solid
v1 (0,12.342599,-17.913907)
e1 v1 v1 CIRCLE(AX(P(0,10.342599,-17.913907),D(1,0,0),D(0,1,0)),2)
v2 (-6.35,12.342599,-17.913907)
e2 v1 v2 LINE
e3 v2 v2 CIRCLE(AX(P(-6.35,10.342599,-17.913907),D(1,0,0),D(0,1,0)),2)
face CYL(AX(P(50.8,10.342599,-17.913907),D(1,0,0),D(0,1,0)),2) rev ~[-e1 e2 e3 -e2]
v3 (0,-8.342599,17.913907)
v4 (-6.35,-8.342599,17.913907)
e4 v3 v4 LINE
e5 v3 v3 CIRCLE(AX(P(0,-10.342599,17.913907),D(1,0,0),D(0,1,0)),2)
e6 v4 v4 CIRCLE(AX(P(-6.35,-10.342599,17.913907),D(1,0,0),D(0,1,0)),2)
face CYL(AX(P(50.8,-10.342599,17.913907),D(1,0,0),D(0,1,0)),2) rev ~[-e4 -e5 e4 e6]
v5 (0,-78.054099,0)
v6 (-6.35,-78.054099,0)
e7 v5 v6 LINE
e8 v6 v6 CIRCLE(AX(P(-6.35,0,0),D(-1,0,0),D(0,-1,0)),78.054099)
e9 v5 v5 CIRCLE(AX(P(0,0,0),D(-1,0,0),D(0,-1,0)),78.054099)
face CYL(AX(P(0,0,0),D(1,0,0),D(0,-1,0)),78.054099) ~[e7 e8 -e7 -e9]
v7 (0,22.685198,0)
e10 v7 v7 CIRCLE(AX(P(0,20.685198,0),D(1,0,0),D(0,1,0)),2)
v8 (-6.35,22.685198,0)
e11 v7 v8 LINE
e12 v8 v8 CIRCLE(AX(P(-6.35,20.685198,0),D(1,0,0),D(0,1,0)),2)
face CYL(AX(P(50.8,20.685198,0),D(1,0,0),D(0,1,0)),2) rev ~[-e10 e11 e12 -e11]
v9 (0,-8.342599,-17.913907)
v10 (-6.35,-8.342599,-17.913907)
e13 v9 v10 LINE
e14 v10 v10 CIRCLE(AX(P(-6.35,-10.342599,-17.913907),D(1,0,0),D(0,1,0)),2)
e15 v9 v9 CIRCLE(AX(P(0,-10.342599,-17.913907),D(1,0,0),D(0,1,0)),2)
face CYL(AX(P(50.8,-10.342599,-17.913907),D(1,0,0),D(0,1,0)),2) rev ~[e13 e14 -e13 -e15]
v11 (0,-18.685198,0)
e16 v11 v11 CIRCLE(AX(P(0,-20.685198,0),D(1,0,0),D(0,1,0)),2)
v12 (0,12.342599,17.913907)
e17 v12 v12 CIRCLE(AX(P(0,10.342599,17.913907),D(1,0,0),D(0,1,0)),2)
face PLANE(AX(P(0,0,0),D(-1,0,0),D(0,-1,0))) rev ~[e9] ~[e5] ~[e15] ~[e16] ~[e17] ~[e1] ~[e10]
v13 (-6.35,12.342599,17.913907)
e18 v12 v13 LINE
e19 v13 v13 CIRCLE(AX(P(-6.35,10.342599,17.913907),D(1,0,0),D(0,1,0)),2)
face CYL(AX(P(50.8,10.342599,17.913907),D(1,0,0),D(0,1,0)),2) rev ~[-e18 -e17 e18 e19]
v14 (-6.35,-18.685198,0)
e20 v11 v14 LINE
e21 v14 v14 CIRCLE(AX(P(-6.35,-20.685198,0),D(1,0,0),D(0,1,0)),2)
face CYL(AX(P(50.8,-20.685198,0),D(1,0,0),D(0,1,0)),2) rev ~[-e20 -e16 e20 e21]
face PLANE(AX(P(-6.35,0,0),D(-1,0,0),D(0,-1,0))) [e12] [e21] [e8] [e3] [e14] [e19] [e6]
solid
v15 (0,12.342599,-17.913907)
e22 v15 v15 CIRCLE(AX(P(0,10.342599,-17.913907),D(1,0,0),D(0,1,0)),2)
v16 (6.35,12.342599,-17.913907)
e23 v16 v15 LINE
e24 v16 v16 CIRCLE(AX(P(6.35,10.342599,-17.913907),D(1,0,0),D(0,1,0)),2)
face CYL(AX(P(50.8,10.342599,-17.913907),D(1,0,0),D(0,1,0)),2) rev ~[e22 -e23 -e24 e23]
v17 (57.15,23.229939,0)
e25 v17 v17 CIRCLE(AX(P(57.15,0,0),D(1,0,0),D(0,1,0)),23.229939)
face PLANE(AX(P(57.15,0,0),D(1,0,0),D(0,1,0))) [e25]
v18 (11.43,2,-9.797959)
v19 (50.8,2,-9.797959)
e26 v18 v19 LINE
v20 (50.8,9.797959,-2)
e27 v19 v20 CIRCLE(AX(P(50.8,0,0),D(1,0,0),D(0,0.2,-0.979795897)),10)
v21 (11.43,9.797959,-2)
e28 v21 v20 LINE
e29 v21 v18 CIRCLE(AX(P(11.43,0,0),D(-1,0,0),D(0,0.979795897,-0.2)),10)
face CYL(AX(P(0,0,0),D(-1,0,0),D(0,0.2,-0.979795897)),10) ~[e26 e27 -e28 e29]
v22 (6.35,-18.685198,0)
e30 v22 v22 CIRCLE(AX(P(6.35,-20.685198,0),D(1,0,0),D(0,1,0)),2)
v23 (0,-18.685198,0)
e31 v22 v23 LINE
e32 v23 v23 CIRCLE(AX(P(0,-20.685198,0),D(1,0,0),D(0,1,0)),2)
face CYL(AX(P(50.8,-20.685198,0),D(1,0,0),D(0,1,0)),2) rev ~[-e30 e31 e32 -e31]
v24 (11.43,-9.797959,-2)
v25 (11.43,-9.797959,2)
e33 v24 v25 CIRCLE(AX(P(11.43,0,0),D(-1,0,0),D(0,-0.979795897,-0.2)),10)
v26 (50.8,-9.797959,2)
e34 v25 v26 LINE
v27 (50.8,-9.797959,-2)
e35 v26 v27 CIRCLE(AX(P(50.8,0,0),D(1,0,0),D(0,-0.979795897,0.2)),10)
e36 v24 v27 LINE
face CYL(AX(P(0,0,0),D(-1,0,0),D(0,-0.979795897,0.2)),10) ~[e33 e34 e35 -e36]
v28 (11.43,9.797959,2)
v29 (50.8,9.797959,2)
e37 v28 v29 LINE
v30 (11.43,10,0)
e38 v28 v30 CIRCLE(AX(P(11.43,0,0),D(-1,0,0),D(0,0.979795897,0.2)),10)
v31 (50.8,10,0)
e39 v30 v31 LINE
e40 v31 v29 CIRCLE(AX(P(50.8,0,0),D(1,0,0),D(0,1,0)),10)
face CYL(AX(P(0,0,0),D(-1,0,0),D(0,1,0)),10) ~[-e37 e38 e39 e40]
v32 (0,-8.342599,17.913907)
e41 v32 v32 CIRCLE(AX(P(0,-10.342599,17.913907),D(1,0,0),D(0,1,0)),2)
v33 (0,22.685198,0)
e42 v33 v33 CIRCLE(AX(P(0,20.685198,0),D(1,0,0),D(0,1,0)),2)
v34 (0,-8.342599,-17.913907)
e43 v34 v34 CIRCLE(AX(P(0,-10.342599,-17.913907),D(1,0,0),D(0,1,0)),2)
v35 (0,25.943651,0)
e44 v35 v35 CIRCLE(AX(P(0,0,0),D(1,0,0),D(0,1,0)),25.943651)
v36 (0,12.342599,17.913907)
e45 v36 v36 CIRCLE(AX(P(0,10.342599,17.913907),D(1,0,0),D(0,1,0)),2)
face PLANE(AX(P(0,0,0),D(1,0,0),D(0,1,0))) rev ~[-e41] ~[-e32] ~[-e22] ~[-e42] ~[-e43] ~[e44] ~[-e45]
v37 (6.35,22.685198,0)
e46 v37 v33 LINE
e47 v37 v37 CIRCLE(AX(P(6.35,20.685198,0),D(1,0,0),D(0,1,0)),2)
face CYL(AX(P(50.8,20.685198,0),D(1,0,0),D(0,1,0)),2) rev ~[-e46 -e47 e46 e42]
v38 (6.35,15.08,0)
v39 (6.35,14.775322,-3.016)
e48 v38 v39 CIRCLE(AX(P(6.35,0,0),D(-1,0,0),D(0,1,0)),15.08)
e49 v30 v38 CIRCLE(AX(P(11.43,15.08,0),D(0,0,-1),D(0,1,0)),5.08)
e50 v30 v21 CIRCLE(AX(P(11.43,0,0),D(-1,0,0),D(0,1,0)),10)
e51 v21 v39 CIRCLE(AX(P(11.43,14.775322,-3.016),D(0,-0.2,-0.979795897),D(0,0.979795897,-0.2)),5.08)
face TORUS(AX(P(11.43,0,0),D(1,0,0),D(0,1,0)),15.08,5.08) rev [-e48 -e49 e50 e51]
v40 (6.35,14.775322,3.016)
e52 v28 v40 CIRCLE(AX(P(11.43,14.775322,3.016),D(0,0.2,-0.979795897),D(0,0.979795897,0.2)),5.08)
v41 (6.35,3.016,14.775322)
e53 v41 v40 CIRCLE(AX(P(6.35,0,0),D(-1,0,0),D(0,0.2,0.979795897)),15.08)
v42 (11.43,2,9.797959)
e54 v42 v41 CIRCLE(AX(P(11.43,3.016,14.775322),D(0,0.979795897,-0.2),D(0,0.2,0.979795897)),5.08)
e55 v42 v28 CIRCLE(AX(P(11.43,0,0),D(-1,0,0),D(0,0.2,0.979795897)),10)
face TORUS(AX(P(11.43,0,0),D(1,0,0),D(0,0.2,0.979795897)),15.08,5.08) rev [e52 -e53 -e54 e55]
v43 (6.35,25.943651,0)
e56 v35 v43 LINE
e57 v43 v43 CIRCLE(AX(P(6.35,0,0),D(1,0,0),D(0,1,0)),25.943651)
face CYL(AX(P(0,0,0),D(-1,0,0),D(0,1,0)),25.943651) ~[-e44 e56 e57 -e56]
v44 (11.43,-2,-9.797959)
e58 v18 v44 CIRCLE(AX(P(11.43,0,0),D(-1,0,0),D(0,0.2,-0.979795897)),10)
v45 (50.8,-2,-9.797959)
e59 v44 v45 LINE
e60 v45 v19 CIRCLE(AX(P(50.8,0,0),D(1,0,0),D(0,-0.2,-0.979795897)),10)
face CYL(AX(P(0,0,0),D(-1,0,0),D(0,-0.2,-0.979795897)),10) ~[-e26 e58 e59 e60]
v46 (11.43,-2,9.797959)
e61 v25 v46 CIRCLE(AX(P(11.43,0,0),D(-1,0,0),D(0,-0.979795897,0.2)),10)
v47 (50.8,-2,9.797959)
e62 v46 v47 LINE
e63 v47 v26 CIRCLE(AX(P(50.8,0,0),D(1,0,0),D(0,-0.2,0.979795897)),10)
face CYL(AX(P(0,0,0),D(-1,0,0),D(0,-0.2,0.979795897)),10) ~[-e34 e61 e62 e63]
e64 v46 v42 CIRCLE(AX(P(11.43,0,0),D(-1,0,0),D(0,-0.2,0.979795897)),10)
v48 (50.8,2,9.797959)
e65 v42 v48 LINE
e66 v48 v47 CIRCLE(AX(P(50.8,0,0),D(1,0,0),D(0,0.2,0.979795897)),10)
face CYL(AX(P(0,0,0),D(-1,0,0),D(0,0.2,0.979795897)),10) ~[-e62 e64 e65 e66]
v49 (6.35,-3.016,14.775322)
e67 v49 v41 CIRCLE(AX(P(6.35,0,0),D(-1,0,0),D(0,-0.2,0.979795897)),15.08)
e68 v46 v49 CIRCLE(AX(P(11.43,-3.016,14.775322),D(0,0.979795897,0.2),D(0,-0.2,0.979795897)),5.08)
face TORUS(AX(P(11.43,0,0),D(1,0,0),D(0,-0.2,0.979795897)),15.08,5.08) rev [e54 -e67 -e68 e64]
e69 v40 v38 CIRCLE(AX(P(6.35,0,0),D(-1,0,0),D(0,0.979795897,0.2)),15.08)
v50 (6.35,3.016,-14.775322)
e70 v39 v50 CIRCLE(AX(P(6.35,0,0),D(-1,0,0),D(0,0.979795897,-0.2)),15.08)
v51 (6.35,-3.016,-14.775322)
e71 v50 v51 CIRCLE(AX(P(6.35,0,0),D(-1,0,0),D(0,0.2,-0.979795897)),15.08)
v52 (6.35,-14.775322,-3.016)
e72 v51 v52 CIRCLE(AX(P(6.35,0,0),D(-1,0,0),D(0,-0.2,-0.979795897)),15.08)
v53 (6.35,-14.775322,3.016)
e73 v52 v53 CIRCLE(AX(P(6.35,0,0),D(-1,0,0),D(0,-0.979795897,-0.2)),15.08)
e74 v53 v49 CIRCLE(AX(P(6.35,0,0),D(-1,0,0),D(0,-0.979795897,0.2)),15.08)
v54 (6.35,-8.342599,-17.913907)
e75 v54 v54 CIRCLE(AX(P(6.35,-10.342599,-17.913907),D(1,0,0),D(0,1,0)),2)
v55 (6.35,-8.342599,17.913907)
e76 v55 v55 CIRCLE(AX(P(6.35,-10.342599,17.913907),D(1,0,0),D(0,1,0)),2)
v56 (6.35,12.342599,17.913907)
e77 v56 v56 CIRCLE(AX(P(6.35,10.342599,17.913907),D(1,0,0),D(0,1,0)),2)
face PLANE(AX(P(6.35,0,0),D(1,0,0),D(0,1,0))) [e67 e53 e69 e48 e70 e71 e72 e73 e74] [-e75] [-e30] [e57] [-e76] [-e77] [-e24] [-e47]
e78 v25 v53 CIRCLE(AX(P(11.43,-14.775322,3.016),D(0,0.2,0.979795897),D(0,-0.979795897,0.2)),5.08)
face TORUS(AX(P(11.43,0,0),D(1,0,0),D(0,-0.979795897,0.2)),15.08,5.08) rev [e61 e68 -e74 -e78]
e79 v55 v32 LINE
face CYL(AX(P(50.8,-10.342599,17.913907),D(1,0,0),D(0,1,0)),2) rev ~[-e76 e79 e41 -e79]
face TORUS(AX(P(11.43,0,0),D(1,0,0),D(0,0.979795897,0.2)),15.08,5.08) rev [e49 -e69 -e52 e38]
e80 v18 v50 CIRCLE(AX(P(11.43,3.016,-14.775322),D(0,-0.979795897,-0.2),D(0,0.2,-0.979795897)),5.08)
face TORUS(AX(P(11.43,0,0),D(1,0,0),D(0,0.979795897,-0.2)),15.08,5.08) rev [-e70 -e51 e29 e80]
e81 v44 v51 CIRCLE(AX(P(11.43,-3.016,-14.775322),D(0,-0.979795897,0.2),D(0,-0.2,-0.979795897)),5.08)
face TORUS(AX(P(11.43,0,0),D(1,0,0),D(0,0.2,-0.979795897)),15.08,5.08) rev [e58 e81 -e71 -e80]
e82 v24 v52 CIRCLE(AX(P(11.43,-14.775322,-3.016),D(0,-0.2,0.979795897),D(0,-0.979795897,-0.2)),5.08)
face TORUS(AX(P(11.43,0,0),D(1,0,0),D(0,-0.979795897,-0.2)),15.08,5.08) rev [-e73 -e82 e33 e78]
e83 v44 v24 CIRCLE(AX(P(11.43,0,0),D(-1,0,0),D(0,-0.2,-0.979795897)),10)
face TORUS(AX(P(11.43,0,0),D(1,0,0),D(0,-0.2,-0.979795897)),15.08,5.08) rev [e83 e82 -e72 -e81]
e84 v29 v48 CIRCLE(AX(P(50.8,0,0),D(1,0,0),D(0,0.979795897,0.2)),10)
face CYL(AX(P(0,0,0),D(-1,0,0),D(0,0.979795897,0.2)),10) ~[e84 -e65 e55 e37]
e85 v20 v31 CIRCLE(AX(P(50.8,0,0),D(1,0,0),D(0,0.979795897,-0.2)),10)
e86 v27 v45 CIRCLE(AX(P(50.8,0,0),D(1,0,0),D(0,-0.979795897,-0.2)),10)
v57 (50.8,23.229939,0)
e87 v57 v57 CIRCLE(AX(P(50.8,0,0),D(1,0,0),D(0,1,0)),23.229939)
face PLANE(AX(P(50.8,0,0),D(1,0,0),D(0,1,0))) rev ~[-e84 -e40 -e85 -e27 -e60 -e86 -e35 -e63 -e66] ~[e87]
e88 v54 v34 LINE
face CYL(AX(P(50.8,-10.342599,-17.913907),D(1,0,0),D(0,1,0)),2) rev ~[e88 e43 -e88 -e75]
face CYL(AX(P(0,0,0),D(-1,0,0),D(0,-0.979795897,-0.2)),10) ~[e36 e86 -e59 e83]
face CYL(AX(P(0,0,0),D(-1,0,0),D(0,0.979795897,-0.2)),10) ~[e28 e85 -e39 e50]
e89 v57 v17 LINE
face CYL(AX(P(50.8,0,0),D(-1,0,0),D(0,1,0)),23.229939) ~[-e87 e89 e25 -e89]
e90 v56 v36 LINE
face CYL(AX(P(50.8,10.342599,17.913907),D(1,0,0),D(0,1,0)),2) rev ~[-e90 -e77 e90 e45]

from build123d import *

# Parameters (mm, degrees)
F0_W       = 6
F0_H       = 4
F0_W_2     = 4
F0_H_2     = 6
F1_DEPTH   = 50.8
F0_R       = 25.9436510784
F2_DEPTH   = 6.35
F3_R       = 78.0540986602
F3_R_2     = 25.9436510784
F4_DEPTH   = 6.35
F5_R       = 23.2299386705
F5_W       = 4
F5_H       = 6
F5_W_2     = 6
F5_H_2     = 4
F6_DEPTH   = 6.35
F7_R       = 5.08
F8_D       = 4
F8_DEPTH   = 57.151
F8_2_D     = 4
F8_2_DEPTH = 57.151


with BuildPart() as f1:
    # F0 (on Right) → F1 (new body)
    with BuildSketch(Plane.YZ):
        with BuildLine():
            ThreePointArc((2, -9.7979589711), (7.0710678119, -7.0710678119), (9.7979589711, -2))
            Line((9.7979589711, -2), (8, -2))
            Line((8, -2), (2, -2))
            Line((2, -2), (2, -8))
            Line((2, -8), (2, -9.7979589711))
        make_face()
        with BuildLine():
            ThreePointArc((-9.7979589711, -2), (-7.0710678119, -7.0710678119), (-2, -9.7979589711))
            Line((-2, -9.7979589711), (-2, -8))
            Line((-2, -8), (-2, -2))
            Line((-2, -2), (-8, -2))
            Line((-8, -2), (-9.7979589711, -2))
        make_face()
        with BuildLine():
            Line((-2, 8), (-2, 9.7979589711))
            ThreePointArc((-2, 9.7979589711), (-7.0710678119, 7.0710678119), (-9.7979589711, 2))
            Line((-9.7979589711, 2), (-8, 2))
            Line((-8, 2), (-2, 2))
            Line((-2, 2), (-2, 8))
        make_face()
        with BuildLine():
            Line((8, 2), (9.7979589711, 2))
            ThreePointArc((9.7979589711, 2), (7.0710678119, 7.0710678119), (2, 9.7979589711))
            Line((2, 9.7979589711), (2, 8))
            Line((2, 8), (2, 2))
            Line((2, 2), (8, 2))
        make_face()
        with Locations((5, 0)):
            Rectangle(F0_W, F0_H)
        Rectangle(F0_W_2, F0_H)
        with Locations((0, 5)):
            Rectangle(F0_W_2, F0_H_2)
        with Locations((-5, 0)):
            Rectangle(F0_W, F0_H)
        with Locations((0, -5)):
            Rectangle(F0_W_2, F0_H_2)
        with BuildLine():
            Line((-8, 2), (-9.7979589711, 2))
            ThreePointArc((-9.7979589711, 2), (-10, 0), (-9.7979589711, -2))
            Line((-9.7979589711, -2), (-8, -2))
            Line((-8, -2), (-8, 2))
        make_face()
        with BuildLine():
            ThreePointArc((-2, -9.7979589711), (0, -10), (2, -9.7979589711))
            Line((2, -9.7979589711), (2, -8))
            Line((2, -8), (-2, -8))
            Line((-2, -8), (-2, -9.7979589711))
        make_face()
        with BuildLine():
            ThreePointArc((9.7979589711, -2), (9.9493615301, -1.0050896201), (10, 0))
            ThreePointArc((10, 0), (9.9493615301, 1.0050896201), (9.7979589711, 2))
            Line((9.7979589711, 2), (8, 2))
            Line((8, 2), (8, -2))
            Line((8, -2), (9.7979589711, -2))
        make_face()
        with BuildLine():
            Line((2, 8), (2, 9.7979589711))
            ThreePointArc((2, 9.7979589711), (0, 10), (-2, 9.7979589711))
            Line((-2, 9.7979589711), (-2, 8))
            Line((-2, 8), (2, 8))
        make_face()
    extrude(amount=F1_DEPTH)

    # F0 (on Right) → F2 (join)
    with BuildSketch(Plane.YZ):
        Circle(F0_R)
        Polygon((10.3425991178, 17.9139071543), (20.6851982355, 0), (10.3425991178, -17.9139071543), (-10.3425991178, -17.9139071543), (-20.6851982355, 0), (-10.3425991178, 17.9139071543), align=None, mode=Mode.SUBTRACT)
        Polygon((10.3425991178, -17.9139071543), (20.6851982355, 0), (10.3425991178, 17.9139071543), (-10.3425991178, 17.9139071543), (-20.6851982355, 0), (-10.3425991178, -17.9139071543), align=None)
        with BuildLine():
            ThreePointArc((2, 9.7979589711), (7.0710678119, 7.0710678119), (9.7979589711, 2))
            Line((9.7979589711, 2), (12.5, 2))
            Line((12.5, 2), (12.5, -2))
            Line((12.5, -2), (9.7979589711, -2))
            ThreePointArc((9.7979589711, -2), (7.0710678119, -7.0710678119), (2, -9.7979589711))
            Line((2, -9.7979589711), (2, -12.5))
            Line((2, -12.5), (-2, -12.5))
            Line((-2, -12.5), (-2, -9.7979589711))
            ThreePointArc((-2, -9.7979589711), (-7.0710678119, -7.0710678119), (-9.7979589711, -2))
            Line((-9.7979589711, -2), (-12.5, -2))
            Line((-12.5, -2), (-12.5, 2))
            Line((-12.5, 2), (-9.7979589711, 2))
            ThreePointArc((-9.7979589711, 2), (-7.0710678119, 7.0710678119), (-2, 9.7979589711))
            Line((-2, 9.7979589711), (-2, 12.5))
            Line((-2, 12.5), (2, 12.5))
            Line((2, 12.5), (2, 9.7979589711))
        make_face(mode=Mode.SUBTRACT)
        with BuildLine():
            ThreePointArc((-2, 9.7979589711), (0, 10), (2, 9.7979589711))
            Line((2, 9.7979589711), (2, 12.5))
            Line((2, 12.5), (-2, 12.5))
            Line((-2, 12.5), (-2, 9.7979589711))
        make_face()
        with BuildLine():
            ThreePointArc((9.7979589711, 2), (9.9493615301, 1.0050896201), (10, 0))
            ThreePointArc((10, 0), (9.9493615301, -1.0050896201), (9.7979589711, -2))
            Line((9.7979589711, -2), (12.5, -2))
            Line((12.5, -2), (12.5, 2))
            Line((12.5, 2), (9.7979589711, 2))
        make_face()
        with BuildLine():
            ThreePointArc((-9.7979589711, -2), (-10, 0), (-9.7979589711, 2))
            Line((-9.7979589711, 2), (-12.5, 2))
            Line((-12.5, 2), (-12.5, -2))
            Line((-12.5, -2), (-9.7979589711, -2))
        make_face()
        with BuildLine():
            Line((2, -12.5), (2, -9.7979589711))
            ThreePointArc((2, -9.7979589711), (0, -10), (-2, -9.7979589711))
            Line((-2, -9.7979589711), (-2, -12.5))
            Line((-2, -12.5), (2, -12.5))
        make_face()
    extrude(amount=F2_DEPTH)

    # F5 (on face) → F6 (join)
    with BuildSketch(Plane.YZ.offset(50.8)):
        Circle(F5_R)
        Polygon((10.3425991178, 17.9139071543), (20.6851982355, 0), (10.3425991178, -17.9139071543), (-10.3425991178, -17.9139071543), (-20.6851982355, 0), (-10.3425991178, 17.9139071543), align=None, mode=Mode.SUBTRACT)
        Polygon((10.3425991178, -17.9139071543), (20.6851982355, 0), (10.3425991178, 17.9139071543), (-10.3425991178, 17.9139071543), (-20.6851982355, 0), (-10.3425991178, -17.9139071543), align=None)
        with BuildLine():
            ThreePointArc((2, 9.7979589711), (7.0710678119, 7.0710678119), (9.7979589711, 2))
            Line((9.7979589711, 2), (12.5, 2))
            Line((12.5, 2), (12.5, -2))
            Line((12.5, -2), (9.7979589711, -2))
            ThreePointArc((9.7979589711, -2), (7.0710678119, -7.0710678119), (2, -9.7979589711))
            Line((2, -9.7979589711), (2, -12.5))
            Line((2, -12.5), (-2, -12.5))
            Line((-2, -12.5), (-2, -9.7979589711))
            ThreePointArc((-2, -9.7979589711), (-7.0710678119, -7.0710678119), (-9.7979589711, -2))
            Line((-9.7979589711, -2), (-12.5, -2))
            Line((-12.5, -2), (-12.5, 2))
            Line((-12.5, 2), (-9.7979589711, 2))
            ThreePointArc((-9.7979589711, 2), (-7.0710678119, 7.0710678119), (-2, 9.7979589711))
            Line((-2, 9.7979589711), (-2, 12.5))
            Line((-2, 12.5), (2, 12.5))
            Line((2, 12.5), (2, 9.7979589711))
        make_face(mode=Mode.SUBTRACT)
        with BuildLine():
            Line((8, 2), (9.7979589711, 2))
            ThreePointArc((9.7979589711, 2), (7.0710678119, 7.0710678119), (2, 9.7979589711))
            Line((2, 9.7979589711), (2, 8))
            Line((2, 8), (2, 2))
            Line((2, 2), (8, 2))
        make_face()
        with BuildLine():
            ThreePointArc((2, -9.7979589711), (7.0710678119, -7.0710678119), (9.7979589711, -2))
            Line((9.7979589711, -2), (8, -2))
            Line((8, -2), (2, -2))
            Line((2, -2), (2, -8))
            Line((2, -8), (2, -9.7979589711))
        make_face()
        with BuildLine():
            ThreePointArc((-9.7979589711, -2), (-7.0710678119, -7.0710678119), (-2, -9.7979589711))
            Line((-2, -9.7979589711), (-2, -8))
            Line((-2, -8), (-2, -2))
            Line((-2, -2), (-8, -2))
            Line((-8, -2), (-9.7979589711, -2))
        make_face()
        with BuildLine():
            Line((-2, 8), (-2, 9.7979589711))
            ThreePointArc((-2, 9.7979589711), (-7.0710678119, 7.0710678119), (-9.7979589711, 2))
            Line((-9.7979589711, 2), (-8, 2))
            Line((-8, 2), (-2, 2))
            Line((-2, 2), (-2, 8))
        make_face()
        with Locations((0, 5)):
            Rectangle(F5_W, F5_H)
        with Locations((5, 0)):
            Rectangle(F5_W_2, F5_H_2)
        with Locations((0, -5)):
            Rectangle(F5_W, F5_H)
        with Locations((-5, 0)):
            Rectangle(F5_W_2, F5_H_2)
        Rectangle(F5_W, F5_H_2)
        with BuildLine():
            ThreePointArc((-2, 9.7979589711), (0, 10), (2, 9.7979589711))
            Line((2, 9.7979589711), (2, 12.5))
            Line((2, 12.5), (-2, 12.5))
            Line((-2, 12.5), (-2, 9.7979589711))
        make_face()
        with BuildLine():
            ThreePointArc((9.7979589711, 2), (9.9493615301, 1.0050896201), (10, 0))
            ThreePointArc((10, 0), (9.9493615301, -1.0050896201), (9.7979589711, -2))
            Line((9.7979589711, -2), (12.5, -2))
            Line((12.5, -2), (12.5, 2))
            Line((12.5, 2), (9.7979589711, 2))
        make_face()
        with BuildLine():
            Line((2, -12.5), (2, -9.7979589711))
            ThreePointArc((2, -9.7979589711), (0, -10), (-2, -9.7979589711))
            Line((-2, -9.7979589711), (-2, -12.5))
            Line((-2, -12.5), (2, -12.5))
        make_face()
        with BuildLine():
            ThreePointArc((-9.7979589711, -2), (-10, 0), (-9.7979589711, 2))
            Line((-9.7979589711, 2), (-12.5, 2))
            Line((-12.5, 2), (-12.5, -2))
            Line((-12.5, -2), (-9.7979589711, -2))
        make_face()
        with BuildLine():
            Line((2, 8), (2, 9.7979589711))
            ThreePointArc((2, 9.7979589711), (0, 10), (-2, 9.7979589711))
            Line((-2, 9.7979589711), (-2, 8))
            Line((-2, 8), (2, 8))
        make_face()
        with BuildLine():
            ThreePointArc((9.7979589711, -2), (9.9493615301, -1.0050896201), (10, 0))
            ThreePointArc((10, 0), (9.9493615301, 1.0050896201), (9.7979589711, 2))
            Line((9.7979589711, 2), (8, 2))
            Line((8, 2), (8, -2))
            Line((8, -2), (9.7979589711, -2))
        make_face()
        with BuildLine():
            ThreePointArc((-2, -9.7979589711), (0, -10), (2, -9.7979589711))
            Line((2, -9.7979589711), (2, -8))
            Line((2, -8), (-2, -8))
            Line((-2, -8), (-2, -9.7979589711))
        make_face()
        with BuildLine():
            Line((-8, 2), (-9.7979589711, 2))
            ThreePointArc((-9.7979589711, 2), (-10, 0), (-9.7979589711, -2))
            Line((-9.7979589711, -2), (-8, -2))
            Line((-8, -2), (-8, 2))
        make_face()
    extrude(amount=F6_DEPTH)

    # F7
    f7_edges = [f1.edges().sort_by_distance(p)[0] for p in [
        (6.35, -2, -9.797959),
    ]]
    fillet(f7_edges, radius=F7_R)

    # F8 (through all, one way)
    with BuildSketch(Plane.YZ.offset(50.8)):
        with Locations((10.3425991178, 17.9139071543), (20.6851982355, 0), (-10.3425991178, 17.9139071543), (10.3425991178, -17.9139071543), (-10.3425991178, -17.9139071543), (-20.6851982355, 0)):
            Circle(F8_D / 2)
    extrude(amount=-F8_DEPTH, mode=Mode.SUBTRACT)


with BuildPart() as f4:
    # F3 (on face) → F4 (new body)
    with BuildSketch(Plane(origin=(0, 0, 0), x_dir=(0, -1, 0), z_dir=(-1, 0, 0))):
        Circle(F3_R)
        Circle(F3_R_2, mode=Mode.SUBTRACT)
        Circle(F3_R_2)
    extrude(amount=F4_DEPTH)

    # F8#2 (through all, one way)
    with BuildSketch(Plane.YZ.offset(50.8)):
        with Locations((10.3425991178, 17.9139071543), (20.6851982355, 0), (-10.3425991178, 17.9139071543), (10.3425991178, -17.9139071543), (-10.3425991178, -17.9139071543), (-20.6851982355, 0)):
            Circle(F8_2_D / 2)
    extrude(amount=-F8_2_DEPTH, mode=Mode.SUBTRACT)


solid = Compound([f1.part, f4.part])
